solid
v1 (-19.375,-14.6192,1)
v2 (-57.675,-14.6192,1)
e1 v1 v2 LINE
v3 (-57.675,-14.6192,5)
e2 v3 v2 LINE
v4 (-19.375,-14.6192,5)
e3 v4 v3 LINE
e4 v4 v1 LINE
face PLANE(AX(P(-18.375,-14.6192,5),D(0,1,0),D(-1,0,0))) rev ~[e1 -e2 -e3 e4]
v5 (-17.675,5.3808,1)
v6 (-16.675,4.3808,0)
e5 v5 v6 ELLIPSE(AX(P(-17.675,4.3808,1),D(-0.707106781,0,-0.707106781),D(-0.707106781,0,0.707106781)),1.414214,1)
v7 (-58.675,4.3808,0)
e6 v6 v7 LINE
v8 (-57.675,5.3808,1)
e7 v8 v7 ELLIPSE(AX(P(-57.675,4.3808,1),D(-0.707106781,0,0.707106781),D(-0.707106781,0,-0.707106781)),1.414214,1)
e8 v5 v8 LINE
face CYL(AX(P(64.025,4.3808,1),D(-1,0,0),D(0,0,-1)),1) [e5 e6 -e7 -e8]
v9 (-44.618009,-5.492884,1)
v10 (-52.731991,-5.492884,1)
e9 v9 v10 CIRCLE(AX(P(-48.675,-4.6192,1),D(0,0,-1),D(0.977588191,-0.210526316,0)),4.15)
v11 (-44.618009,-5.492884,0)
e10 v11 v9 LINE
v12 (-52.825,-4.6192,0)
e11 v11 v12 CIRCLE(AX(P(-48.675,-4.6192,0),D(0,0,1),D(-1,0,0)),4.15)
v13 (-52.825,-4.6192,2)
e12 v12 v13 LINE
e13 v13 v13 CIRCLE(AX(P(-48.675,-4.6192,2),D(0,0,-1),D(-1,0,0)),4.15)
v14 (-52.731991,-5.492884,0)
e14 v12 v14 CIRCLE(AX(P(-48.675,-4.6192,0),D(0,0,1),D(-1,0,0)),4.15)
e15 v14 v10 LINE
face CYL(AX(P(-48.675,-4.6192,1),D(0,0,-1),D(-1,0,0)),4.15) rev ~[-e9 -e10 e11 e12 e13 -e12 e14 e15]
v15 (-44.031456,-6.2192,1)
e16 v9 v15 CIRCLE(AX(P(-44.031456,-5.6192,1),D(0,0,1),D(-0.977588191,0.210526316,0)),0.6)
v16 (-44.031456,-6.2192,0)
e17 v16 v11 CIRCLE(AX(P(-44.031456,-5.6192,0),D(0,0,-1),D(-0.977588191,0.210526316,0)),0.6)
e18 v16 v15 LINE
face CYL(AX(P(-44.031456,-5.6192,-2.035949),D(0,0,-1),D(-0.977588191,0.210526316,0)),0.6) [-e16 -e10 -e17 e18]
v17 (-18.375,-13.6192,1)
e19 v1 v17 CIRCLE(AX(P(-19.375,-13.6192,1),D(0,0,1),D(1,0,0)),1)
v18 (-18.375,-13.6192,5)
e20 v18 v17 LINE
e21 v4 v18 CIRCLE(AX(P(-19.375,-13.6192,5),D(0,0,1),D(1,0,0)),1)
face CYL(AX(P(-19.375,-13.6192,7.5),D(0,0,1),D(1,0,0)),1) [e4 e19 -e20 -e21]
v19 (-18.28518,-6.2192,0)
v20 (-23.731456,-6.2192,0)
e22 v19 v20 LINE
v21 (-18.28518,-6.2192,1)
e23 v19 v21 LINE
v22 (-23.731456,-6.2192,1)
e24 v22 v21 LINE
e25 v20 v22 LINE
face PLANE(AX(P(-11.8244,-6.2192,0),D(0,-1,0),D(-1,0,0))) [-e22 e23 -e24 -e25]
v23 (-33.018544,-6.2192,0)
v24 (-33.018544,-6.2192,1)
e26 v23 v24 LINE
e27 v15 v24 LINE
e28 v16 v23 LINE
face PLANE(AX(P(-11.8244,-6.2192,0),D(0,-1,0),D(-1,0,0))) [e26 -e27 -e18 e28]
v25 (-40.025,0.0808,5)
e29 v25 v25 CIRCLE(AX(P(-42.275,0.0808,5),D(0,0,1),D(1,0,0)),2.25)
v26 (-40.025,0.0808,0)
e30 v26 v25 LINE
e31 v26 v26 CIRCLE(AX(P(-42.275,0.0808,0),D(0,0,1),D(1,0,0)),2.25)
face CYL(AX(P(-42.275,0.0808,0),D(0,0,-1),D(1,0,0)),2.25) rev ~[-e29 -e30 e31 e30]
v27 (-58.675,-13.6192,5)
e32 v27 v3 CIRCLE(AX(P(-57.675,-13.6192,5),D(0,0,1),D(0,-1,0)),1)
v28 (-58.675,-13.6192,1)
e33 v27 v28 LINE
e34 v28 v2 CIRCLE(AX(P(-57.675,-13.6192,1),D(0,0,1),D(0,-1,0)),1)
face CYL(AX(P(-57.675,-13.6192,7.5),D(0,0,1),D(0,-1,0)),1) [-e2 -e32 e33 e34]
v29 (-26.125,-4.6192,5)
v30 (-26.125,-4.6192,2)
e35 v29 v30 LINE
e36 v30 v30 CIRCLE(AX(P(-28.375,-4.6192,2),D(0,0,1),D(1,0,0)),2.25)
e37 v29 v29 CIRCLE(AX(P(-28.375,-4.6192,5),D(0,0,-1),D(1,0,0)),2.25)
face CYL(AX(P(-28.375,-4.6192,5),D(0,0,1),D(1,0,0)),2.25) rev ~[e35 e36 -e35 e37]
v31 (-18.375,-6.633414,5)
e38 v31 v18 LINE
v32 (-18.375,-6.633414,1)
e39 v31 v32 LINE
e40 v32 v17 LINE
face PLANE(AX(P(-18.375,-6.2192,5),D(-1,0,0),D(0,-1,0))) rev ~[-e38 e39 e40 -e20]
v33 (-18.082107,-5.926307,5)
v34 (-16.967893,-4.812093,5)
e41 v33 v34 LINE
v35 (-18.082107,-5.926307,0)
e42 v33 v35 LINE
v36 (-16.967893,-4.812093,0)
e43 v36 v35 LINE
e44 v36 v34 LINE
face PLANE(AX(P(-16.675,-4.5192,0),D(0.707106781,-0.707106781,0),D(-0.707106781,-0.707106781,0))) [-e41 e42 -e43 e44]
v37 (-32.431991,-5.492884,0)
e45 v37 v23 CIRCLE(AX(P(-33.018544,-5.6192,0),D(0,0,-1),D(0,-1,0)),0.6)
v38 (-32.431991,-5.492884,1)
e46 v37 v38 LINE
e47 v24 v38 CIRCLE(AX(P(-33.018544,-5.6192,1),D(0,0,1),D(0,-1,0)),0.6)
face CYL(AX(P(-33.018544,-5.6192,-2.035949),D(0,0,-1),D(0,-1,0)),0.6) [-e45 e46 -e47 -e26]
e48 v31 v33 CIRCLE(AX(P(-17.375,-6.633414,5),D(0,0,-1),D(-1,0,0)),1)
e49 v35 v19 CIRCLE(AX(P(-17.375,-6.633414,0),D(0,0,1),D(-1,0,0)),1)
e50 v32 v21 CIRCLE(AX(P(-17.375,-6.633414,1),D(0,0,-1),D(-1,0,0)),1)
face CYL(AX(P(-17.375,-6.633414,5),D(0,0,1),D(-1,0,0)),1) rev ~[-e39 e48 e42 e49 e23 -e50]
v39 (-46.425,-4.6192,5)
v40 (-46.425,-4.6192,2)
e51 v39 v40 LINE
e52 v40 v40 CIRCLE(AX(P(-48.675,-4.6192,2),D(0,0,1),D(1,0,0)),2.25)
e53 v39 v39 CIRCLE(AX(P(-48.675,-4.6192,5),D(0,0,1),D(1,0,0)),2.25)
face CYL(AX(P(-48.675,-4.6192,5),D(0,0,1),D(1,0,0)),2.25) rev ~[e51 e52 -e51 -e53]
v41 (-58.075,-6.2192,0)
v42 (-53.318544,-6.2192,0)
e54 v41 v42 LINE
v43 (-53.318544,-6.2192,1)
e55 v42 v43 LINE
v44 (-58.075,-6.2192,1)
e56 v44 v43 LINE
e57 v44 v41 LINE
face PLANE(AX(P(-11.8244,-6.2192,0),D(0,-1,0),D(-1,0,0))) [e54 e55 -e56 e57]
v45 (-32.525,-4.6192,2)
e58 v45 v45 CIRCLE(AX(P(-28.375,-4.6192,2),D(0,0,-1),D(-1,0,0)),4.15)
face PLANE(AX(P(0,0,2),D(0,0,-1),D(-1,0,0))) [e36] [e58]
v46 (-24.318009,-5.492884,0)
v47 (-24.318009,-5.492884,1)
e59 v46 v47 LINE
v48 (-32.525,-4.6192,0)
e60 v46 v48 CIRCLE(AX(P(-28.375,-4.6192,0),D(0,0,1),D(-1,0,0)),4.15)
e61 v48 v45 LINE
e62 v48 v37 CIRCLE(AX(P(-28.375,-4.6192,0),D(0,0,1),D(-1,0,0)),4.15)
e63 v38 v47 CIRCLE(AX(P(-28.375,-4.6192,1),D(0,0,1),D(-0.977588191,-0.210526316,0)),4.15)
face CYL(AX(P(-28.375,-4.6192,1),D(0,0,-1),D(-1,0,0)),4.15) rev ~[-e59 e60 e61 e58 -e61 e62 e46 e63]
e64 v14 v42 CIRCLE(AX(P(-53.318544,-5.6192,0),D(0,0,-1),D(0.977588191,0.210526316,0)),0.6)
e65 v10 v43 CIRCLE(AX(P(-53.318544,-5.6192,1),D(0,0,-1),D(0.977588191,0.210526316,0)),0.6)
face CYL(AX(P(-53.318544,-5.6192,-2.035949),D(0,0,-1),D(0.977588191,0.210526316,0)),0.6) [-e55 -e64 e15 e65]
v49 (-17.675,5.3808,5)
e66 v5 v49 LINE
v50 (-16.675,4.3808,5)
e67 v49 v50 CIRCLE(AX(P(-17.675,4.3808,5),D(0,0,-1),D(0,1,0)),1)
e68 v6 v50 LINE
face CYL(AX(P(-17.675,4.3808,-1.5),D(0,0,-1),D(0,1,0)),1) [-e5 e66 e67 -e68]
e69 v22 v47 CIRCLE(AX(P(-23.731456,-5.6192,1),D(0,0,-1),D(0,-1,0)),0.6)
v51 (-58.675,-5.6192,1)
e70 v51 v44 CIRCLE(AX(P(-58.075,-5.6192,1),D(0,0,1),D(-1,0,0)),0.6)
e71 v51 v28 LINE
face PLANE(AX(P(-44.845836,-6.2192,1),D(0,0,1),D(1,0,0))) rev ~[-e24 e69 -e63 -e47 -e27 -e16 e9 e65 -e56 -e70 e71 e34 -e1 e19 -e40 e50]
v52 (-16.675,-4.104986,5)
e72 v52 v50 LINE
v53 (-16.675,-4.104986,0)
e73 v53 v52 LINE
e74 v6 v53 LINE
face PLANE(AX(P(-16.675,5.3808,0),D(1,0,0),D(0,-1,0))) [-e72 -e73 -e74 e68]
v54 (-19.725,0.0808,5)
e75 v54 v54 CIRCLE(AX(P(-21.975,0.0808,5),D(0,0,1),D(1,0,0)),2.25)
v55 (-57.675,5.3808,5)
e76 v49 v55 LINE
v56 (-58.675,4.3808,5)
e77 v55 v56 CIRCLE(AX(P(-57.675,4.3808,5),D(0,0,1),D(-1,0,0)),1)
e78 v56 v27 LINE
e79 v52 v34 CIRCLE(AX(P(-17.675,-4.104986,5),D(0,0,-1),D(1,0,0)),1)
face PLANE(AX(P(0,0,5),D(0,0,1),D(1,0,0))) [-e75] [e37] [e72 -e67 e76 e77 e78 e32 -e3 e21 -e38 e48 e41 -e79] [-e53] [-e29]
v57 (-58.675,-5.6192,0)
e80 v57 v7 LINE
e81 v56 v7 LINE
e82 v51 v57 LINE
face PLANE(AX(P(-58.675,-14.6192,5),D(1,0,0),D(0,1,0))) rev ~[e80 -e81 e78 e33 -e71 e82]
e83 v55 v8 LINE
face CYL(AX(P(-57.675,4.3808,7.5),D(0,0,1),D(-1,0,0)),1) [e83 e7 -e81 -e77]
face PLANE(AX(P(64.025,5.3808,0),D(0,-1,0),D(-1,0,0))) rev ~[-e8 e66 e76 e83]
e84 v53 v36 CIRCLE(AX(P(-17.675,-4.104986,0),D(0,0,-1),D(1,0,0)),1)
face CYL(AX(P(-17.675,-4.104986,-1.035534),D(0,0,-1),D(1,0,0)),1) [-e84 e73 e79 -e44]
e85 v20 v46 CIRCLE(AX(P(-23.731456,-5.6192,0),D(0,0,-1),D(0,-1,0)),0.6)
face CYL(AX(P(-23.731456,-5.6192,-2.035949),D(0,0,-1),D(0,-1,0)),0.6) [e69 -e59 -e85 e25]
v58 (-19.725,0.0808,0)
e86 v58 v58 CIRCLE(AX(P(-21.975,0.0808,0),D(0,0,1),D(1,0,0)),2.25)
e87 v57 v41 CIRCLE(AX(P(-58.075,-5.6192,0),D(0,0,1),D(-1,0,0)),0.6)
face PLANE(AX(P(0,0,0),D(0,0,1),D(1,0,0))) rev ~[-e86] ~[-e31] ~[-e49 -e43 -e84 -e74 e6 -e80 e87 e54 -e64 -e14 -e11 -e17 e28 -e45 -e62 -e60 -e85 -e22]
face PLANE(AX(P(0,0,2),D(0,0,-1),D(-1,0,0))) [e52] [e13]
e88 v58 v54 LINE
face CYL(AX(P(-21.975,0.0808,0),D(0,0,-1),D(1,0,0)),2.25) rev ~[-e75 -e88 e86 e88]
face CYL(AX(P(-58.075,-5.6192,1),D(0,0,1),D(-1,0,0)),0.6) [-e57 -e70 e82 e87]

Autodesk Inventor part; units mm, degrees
ref_plane "YZ Plane" through (0, 0, 0) normal (1, 0, 0) x (0, 1, 0)
ref_plane "XZ Plane" through (0, 0, 0) normal (0, 1, 0) x (-1, 0, 0)
ref_plane "XY Plane" through (0, 0, 0) normal (0, 0, 1) x (1, 0, 0)
sketch "スケッチ1" plane through (0, 0, 0) normal (0, 0, 1) x (1, 0, 0)
  arc A0 (-17.9, -5.9192) -> (-17.6, -6.2192) centre (-17.6, -5.9192) ccw construction
  line L0 (-17.6, -6.2192) -> (-11.8244, -6.2192) construction
  line L1 (-11.8244, -6.2192) -> (-9.5, -2.219) projected
  arc A1 (-9.2172, -2.0192) -> (-9.5, -2.219) centre (-9.2172, -2.3192) ccw projected
  line L2 (-9.2172, -2.0192) -> (-6.9328, -2.0192) projected
  arc A2 (-6.65, -2.219) -> (-6.9328, -2.0192) centre (-6.9328, -2.3192) ccw projected
  line L3 (-6.65, -2.219) -> (-4.3256, -6.2192) projected
  line L4 (-4.3256, -6.2192) -> (8.4756, -6.2192) construction
  line L5 (8.4756, -6.2192) -> (10.8, -2.219) projected
  arc A3 (11.0828, -2.0192) -> (10.8, -2.219) centre (11.0828, -2.3192) ccw projected
  line L6 (11.0828, -2.0192) -> (13.3672, -2.0192) projected
  arc A4 (13.65, -2.219) -> (13.3672, -2.0192) centre (13.3672, -2.3192) ccw projected
  line L7 (13.65, -2.219) -> (15.9744, -6.2192) projected
  line L8 (15.9744, -6.2192) -> (21.25, -6.2192) construction
  arc A5 (21.25, -6.2192) -> (21.55, -5.9192) centre (21.25, -5.9192) ccw construction
  line L9 (21.55, -2.3692) -> (21.55, -5.9192) construction
  arc A6 (21.55, -2.3692) -> (21.25, -2.0692) centre (21.25, -2.3692) ccw construction
  line L10 (21.25, -2.0692) -> (17.65, -2.0692) construction
  arc A7 (17.65, 2.2308) -> (17.65, -2.0692) centre (17.65, 0.0808) ccw construction
  line L11 (17.65, 2.2308) -> (21.25, 2.2308) construction
  arc A8 (21.25, 2.2308) -> (21.55, 2.5308) centre (21.25, 2.5308) ccw construction
  line L12 (21.55, 4.8808) -> (21.55, 2.5308) construction
  line L13 (21.55, 4.8808) -> (-17.9, 4.8808) construction
  line L14 (-17.9, 4.8808) -> (-17.9, -5.9192) construction
  line L15 (1.3, 1.9308) -> (1.3, -1.7692) construction
  arc A9 (1, -2.0692) -> (1.3, -1.7692) centre (1, -1.7692) ccw construction
  line L16 (1, -2.0692) -> (-2.5, -2.0692) construction
  arc A10 (-2.5, 2.2308) -> (-2.5, -2.0692) centre (-2.5, 0.0808) ccw construction
  line L17 (-2.5, 2.2308) -> (1, 2.2308) construction
  arc A11 (1.3, 1.9308) -> (1, 2.2308) centre (1, 1.9308) ccw construction
  line L18 (-17.9, 5.3808) -> (21.55, 5.3808) construction
  circle A12 centre (-0.85, 0.0808) radius 2.15 construction
  line L19 (-0.85, 0.0808) -> (-2.5, 0.0808) construction
  circle A13 centre (-1.675, 0.0808) radius 2.25
  line L20 (64.025, 2.5048) -> (64.025, 91.3712) construction
  line L21 (-65.975, 91.3712) -> (-65.975, 2.5048) construction
  line L22 (64.025, 5.3808) -> (-65.975, 5.3808)
  circle A14 centre (18.625, 0.0808) radius 2.25
  circle A15 centre (38.925, 0.0808) radius 2.25
  circle A16 centre (59.225, 0.0808) radius 2.25
  circle A17 centre (-21.975, 0.0808) radius 2.25
  circle A18 centre (-1.675, 0.0808) radius 2.25
  circle A19 centre (18.625, 0.0808) radius 2.25
  circle A20 centre (38.925, 0.0808) radius 2.25
  circle A21 centre (-42.275, 0.0808) radius 2.25
  circle A22 centre (-21.975, 0.0808) radius 2.25
  circle A23 centre (-1.675, 0.0808) radius 2.25
  circle A24 centre (18.625, 0.0808) radius 2.25
  circle A25 centre (-62.575, 0.0808) radius 2.25
  circle A26 centre (-42.275, 0.0808) radius 2.25
  circle A27 centre (-21.975, 0.0808) radius 2.25
  circle A28 centre (-1.675, 0.0808) radius 2.25
  line L23 (64.025, 5.3808) -> (64.025, -6.2192)
  line L24 (64.025, -6.2192) -> (-65.975, -6.2192)
  line L25 (-65.975, -6.2192) -> (-65.975, 5.3808)
  point P0 (0, 0)
  dimension "d1" = 4.5
  dimension "d4" = 20.3
  dimension "d7" = 20.3
extrude "押し出し1" add sketch "スケッチ1" along normal blind 5 contours L24 L25 L22 L23 L7 A4 L6 A3 L5 L3 A2 L2 A1 L1 | L1 A1 L2 A2 L3 L24 | L5 A3 L6 A4 L7 L24 | A16 | A25
sketch "スケッチ3" plane through (0, 0, 0) normal (0, 0, -1) x (-1, 0, 0)
  line L0 (9.5, -2.219) -> (11.8244, -6.2192) projected
  arc A0 (9.5, -2.219) -> (9.2172, -2.0192) centre (9.2172, -2.3192) ccw projected
  line L1 (6.9328, -2.0192) -> (9.2172, -2.0192) projected
  arc A1 (6.9328, -2.0192) -> (6.65, -2.219) centre (6.9328, -2.3192) ccw projected
  line L2 (4.3256, -6.2192) -> (6.65, -2.219) projected
  line L3 (65.975, -6.2192) -> (-64.025, -6.2192) projected
  point P0 (0, 0)
extrude "押し出し2" cut sketch "スケッチ3" against normal through all
pattern_linear "矩形状パターン1" count 4 spacing 20.3 along (1, 0, 0) count 3 spacing 20.3 along (-1, 0, 0) of "押し出し2"
fillet "フィレット1" radius 1 1 edges at (-0.975, 5.3808, 0)
sketch "スケッチ7" plane through (0, 0, 5) normal (0, 0, 1) x (1, 0, 0)
  line L0 (-52.4244, -6.2192) -> (-50.1, -2.219) projected
  arc A0 (-49.8172, -2.0192) -> (-50.1, -2.219) centre (-49.8172, -2.3192) ccw projected
  line L1 (-49.8172, -2.0192) -> (-47.5328, -2.0192) projected
  arc A1 (-47.25, -2.219) -> (-47.5328, -2.0192) centre (-47.5328, -2.3192) ccw projected
  line L2 (-47.25, -2.219) -> (-44.9256, -6.2192) projected
  line L3 (-32.1244, -6.2192) -> (-29.8, -2.219) projected
  arc A2 (-29.5172, -2.0192) -> (-29.8, -2.219) centre (-29.5172, -2.3192) ccw projected
  line L4 (-29.5172, -2.0192) -> (-27.2328, -2.0192) projected
  arc A3 (-26.95, -2.219) -> (-27.2328, -2.0192) centre (-27.2328, -2.3192) ccw projected
  line L5 (-26.95, -2.219) -> (-24.6256, -6.2192) projected
  line L6 (-11.8244, -6.2192) -> (-9.5, -2.219) projected
  arc A4 (-9.2172, -2.0192) -> (-9.5, -2.219) centre (-9.2172, -2.3192) ccw projected
  line L7 (-9.2172, -2.0192) -> (-6.9328, -2.0192) projected
  arc A5 (-6.65, -2.219) -> (-6.9328, -2.0192) centre (-6.9328, -2.3192) ccw projected
  line L8 (-6.65, -2.219) -> (-4.3256, -6.2192) projected
  line L9 (8.4756, -6.2192) -> (10.8, -2.219) projected
  arc A6 (11.0828, -2.0192) -> (10.8, -2.219) centre (11.0828, -2.3192) ccw projected
  line L10 (11.0828, -2.0192) -> (13.3672, -2.0192) projected
  arc A7 (13.65, -2.219) -> (13.3672, -2.0192) centre (13.3672, -2.3192) ccw projected
  line L11 (13.65, -2.219) -> (15.9744, -6.2192) projected
  line L12 (28.7756, -6.2192) -> (31.1, -2.219) projected
  arc A8 (31.3828, -2.0192) -> (31.1, -2.219) centre (31.3828, -2.3192) ccw projected
  line L13 (31.3828, -2.0192) -> (33.6672, -2.0192) projected
  arc A9 (33.95, -2.219) -> (33.6672, -2.0192) centre (33.6672, -2.3192) ccw projected
  line L14 (33.95, -2.219) -> (36.2744, -6.2192) projected
  line L15 (49.0756, -6.2192) -> (51.4, -2.219) projected
  arc A10 (51.6828, -2.0192) -> (51.4, -2.219) centre (51.6828, -2.3192) ccw projected
  line L16 (51.6828, -2.0192) -> (53.9672, -2.0192) projected
  arc A11 (54.25, -2.219) -> (53.9672, -2.0192) centre (53.9672, -2.3192) ccw projected
  line L17 (54.25, -2.219) -> (56.5744, -6.2192) projected
  line L18 (-52.4244, -6.2192) -> (-44.9256, -6.2192)
  line L19 (-24.6256, -6.2192) -> (-26.95, -2.219) projected
  line L20 (-32.1244, -6.2192) -> (-24.6256, -6.2192)
  line L21 (-9.5, -2.219) -> (-11.8244, -6.2192) projected
  line L22 (-11.8244, -6.2192) -> (-4.3256, -6.2192)
  line L23 (15.9744, -6.2192) -> (8.4756, -6.2192)
  line L24 (36.2744, -6.2192) -> (33.95, -2.219) projected
  line L25 (28.7756, -6.2192) -> (36.2744, -6.2192)
  line L26 (49.0756, -6.2192) -> (56.5744, -6.2192)
  point P0 (0, 0)
extrude "押し出し5" add sketch "スケッチ7" against normal blind 4
sketch "スケッチ8" plane through (0, 0, 5) normal (0, 0, 1) x (1, 0, 0)
  circle A0 centre (-42.275, 0.0808) radius 2.25 projected
  circle A1 centre (-21.975, 0.0808) radius 2.25 projected
  line L0 (-42.275, 0.0808) -> (-21.975, 0.0808) construction
  line L1 (-21.975, 0.0808) -> (-32.125, 0.0808) construction
  line L2 (-48.675, -4.6192) -> (-28.375, -4.6192) construction
  circle A2 centre (-48.675, -4.6192) radius 2.25
  circle A3 centre (-28.375, -4.6192) radius 2.25
  line L3 (-65.975, -6.2192) -> (64.025, -6.2192) projected
  line L4 (-58.675, -6.2192) -> (-18.375, -6.2192)
  line L5 (-18.375, -6.2192) -> (-18.375, -14.6192)
  line L6 (-18.375, -14.6192) -> (-58.675, -14.6192)
  line L7 (-58.675, -14.6192) -> (-58.675, -6.2192)
  line L8 (-65.975, 5.3808) -> (64.025, 5.3808) projected
  line L9 (-27.2328, -2.0192) -> (-29.5172, -2.0192) construction
  point P0 (0, 0)
  point P1 (-38.525, -14.6192)
  point P2 (-18.375, -6.2192)
  point P3 (-38.525, -4.6192)
  point P4 (-28.375, -2.0192)
  point P5 (-28.375, -2.0192)
  dimension "d43" = 20.3
  dimension "d44" = 4.5
  dimension "d45" = 10
  dimension "d46" = 10
  dimension "d53" = 6.4
  dimension "d54" = 10
  dimension "d62" = 4.5
  dimension "d63" = 20.3
extrude "押し出し6" add sketch "スケッチ8" against normal up to surface (4 mm away) contours A2 L3 A3 L5 L6 L7
sketch "スケッチ10" plane through (0, 0, 5) normal (0, 0, 1) x (1, 0, 0)
  arc A0 (-50.2569, -6.2192) -> (-47.0931, -6.2192) centre (-48.675, -4.6192) ccw construction
  arc A1 (-29.9569, -6.2192) -> (-26.7931, -6.2192) centre (-28.375, -4.6192) ccw construction
  circle A2 centre (-48.675, -4.6192) radius 2.25
  circle A3 centre (-28.375, -4.6192) radius 2.25
  point P0 (0, 0)
extrude "押し出し8" cut sketch "スケッチ10" against normal through all
sketch "スケッチ11" plane through (0, 0, 1) normal (0, 0, -1) x (-1, 0, 0)
  circle A0 centre (28.375, -4.6192) radius 2.25 construction
  circle A1 centre (48.675, -4.6192) radius 2.25 construction
  circle A2 centre (28.375, -4.6192) radius 4.15
  circle A3 centre (48.675, -4.6192) radius 4.15
  point P0 (0, 0)
  dimension "d57" = 8.3
extrude "押し出し9" cut sketch "スケッチ11" along normal blind 10 and the other way blind 1
sketch "スケッチ9" plane through (0, 0, 0) normal (0, 0, -1) x (-1, 0, 0)
  line L0 (58.675, -14.6192) -> (58.675, -6.2192) projected
  line L1 (58.675, -14.6192) -> (88.3695, -14.6192)
  line L2 (88.3695, -14.6192) -> (88.3695, 31.2927)
  line L3 (88.3695, 31.2927) -> (58.675, 31.2927)
  line L4 (58.675, 31.2927) -> (58.675, -14.6192)
  line L5 (18.375, -14.6192) -> (-64.2943, -14.6192)
  line L6 (-64.2943, -14.6192) -> (-64.2943, 35.8918)
  line L7 (-64.2943, 35.8918) -> (18.375, 35.8918)
  line L8 (18.375, 35.8918) -> (18.375, -14.6192)
  circle A0 centre (21.975, 0.0808) radius 2.25 construction
  line L9 (65.975, 5.3808) -> (-64.025, 5.3808) construction
  circle A1 centre (21.975, 0.0808) radius 5.3 construction
  line L10 (16.675, 5.3808) -> (16.675, -4.5192)
  line L11 (16.675, -4.5192) -> (18.375, -6.2192)
  line L12 (24.5458, -6.2192) -> (11.8244, -6.2192) projected
  line L13 (16.675, 5.3808) -> (18.375, 5.3808)
  point P0 (0, 0)
  dimension "d64" = 45
extrude "押し出し7" cut sketch "スケッチ9" against normal through all contours L0 L4 L3 L2 L1 | L5 L6 L7 L8 L13 L10 L11
fillet "フィレット2" radius 0.6 5 edges at (-32.2042, -6.2192, 0.5) (-24.5458, -6.2192, 0.5) (-52.5042, -6.2192, 0.5) (-44.8458, -6.2192, 0.5) (-58.675, -6.2192, 0.5)
fillet "フィレット2" radius 1 6 edges at (-58.675, -14.6192, 3) (-18.375, -14.6192, 3) (-58.675, 5.3808, 3) (-16.675, 5.3808, 3) (-16.675, -4.5192, 2.5) (-18.375, -6.2192, 3)
equation "\"d43\" = d63"
properties part number "gpu_hold_plate"
